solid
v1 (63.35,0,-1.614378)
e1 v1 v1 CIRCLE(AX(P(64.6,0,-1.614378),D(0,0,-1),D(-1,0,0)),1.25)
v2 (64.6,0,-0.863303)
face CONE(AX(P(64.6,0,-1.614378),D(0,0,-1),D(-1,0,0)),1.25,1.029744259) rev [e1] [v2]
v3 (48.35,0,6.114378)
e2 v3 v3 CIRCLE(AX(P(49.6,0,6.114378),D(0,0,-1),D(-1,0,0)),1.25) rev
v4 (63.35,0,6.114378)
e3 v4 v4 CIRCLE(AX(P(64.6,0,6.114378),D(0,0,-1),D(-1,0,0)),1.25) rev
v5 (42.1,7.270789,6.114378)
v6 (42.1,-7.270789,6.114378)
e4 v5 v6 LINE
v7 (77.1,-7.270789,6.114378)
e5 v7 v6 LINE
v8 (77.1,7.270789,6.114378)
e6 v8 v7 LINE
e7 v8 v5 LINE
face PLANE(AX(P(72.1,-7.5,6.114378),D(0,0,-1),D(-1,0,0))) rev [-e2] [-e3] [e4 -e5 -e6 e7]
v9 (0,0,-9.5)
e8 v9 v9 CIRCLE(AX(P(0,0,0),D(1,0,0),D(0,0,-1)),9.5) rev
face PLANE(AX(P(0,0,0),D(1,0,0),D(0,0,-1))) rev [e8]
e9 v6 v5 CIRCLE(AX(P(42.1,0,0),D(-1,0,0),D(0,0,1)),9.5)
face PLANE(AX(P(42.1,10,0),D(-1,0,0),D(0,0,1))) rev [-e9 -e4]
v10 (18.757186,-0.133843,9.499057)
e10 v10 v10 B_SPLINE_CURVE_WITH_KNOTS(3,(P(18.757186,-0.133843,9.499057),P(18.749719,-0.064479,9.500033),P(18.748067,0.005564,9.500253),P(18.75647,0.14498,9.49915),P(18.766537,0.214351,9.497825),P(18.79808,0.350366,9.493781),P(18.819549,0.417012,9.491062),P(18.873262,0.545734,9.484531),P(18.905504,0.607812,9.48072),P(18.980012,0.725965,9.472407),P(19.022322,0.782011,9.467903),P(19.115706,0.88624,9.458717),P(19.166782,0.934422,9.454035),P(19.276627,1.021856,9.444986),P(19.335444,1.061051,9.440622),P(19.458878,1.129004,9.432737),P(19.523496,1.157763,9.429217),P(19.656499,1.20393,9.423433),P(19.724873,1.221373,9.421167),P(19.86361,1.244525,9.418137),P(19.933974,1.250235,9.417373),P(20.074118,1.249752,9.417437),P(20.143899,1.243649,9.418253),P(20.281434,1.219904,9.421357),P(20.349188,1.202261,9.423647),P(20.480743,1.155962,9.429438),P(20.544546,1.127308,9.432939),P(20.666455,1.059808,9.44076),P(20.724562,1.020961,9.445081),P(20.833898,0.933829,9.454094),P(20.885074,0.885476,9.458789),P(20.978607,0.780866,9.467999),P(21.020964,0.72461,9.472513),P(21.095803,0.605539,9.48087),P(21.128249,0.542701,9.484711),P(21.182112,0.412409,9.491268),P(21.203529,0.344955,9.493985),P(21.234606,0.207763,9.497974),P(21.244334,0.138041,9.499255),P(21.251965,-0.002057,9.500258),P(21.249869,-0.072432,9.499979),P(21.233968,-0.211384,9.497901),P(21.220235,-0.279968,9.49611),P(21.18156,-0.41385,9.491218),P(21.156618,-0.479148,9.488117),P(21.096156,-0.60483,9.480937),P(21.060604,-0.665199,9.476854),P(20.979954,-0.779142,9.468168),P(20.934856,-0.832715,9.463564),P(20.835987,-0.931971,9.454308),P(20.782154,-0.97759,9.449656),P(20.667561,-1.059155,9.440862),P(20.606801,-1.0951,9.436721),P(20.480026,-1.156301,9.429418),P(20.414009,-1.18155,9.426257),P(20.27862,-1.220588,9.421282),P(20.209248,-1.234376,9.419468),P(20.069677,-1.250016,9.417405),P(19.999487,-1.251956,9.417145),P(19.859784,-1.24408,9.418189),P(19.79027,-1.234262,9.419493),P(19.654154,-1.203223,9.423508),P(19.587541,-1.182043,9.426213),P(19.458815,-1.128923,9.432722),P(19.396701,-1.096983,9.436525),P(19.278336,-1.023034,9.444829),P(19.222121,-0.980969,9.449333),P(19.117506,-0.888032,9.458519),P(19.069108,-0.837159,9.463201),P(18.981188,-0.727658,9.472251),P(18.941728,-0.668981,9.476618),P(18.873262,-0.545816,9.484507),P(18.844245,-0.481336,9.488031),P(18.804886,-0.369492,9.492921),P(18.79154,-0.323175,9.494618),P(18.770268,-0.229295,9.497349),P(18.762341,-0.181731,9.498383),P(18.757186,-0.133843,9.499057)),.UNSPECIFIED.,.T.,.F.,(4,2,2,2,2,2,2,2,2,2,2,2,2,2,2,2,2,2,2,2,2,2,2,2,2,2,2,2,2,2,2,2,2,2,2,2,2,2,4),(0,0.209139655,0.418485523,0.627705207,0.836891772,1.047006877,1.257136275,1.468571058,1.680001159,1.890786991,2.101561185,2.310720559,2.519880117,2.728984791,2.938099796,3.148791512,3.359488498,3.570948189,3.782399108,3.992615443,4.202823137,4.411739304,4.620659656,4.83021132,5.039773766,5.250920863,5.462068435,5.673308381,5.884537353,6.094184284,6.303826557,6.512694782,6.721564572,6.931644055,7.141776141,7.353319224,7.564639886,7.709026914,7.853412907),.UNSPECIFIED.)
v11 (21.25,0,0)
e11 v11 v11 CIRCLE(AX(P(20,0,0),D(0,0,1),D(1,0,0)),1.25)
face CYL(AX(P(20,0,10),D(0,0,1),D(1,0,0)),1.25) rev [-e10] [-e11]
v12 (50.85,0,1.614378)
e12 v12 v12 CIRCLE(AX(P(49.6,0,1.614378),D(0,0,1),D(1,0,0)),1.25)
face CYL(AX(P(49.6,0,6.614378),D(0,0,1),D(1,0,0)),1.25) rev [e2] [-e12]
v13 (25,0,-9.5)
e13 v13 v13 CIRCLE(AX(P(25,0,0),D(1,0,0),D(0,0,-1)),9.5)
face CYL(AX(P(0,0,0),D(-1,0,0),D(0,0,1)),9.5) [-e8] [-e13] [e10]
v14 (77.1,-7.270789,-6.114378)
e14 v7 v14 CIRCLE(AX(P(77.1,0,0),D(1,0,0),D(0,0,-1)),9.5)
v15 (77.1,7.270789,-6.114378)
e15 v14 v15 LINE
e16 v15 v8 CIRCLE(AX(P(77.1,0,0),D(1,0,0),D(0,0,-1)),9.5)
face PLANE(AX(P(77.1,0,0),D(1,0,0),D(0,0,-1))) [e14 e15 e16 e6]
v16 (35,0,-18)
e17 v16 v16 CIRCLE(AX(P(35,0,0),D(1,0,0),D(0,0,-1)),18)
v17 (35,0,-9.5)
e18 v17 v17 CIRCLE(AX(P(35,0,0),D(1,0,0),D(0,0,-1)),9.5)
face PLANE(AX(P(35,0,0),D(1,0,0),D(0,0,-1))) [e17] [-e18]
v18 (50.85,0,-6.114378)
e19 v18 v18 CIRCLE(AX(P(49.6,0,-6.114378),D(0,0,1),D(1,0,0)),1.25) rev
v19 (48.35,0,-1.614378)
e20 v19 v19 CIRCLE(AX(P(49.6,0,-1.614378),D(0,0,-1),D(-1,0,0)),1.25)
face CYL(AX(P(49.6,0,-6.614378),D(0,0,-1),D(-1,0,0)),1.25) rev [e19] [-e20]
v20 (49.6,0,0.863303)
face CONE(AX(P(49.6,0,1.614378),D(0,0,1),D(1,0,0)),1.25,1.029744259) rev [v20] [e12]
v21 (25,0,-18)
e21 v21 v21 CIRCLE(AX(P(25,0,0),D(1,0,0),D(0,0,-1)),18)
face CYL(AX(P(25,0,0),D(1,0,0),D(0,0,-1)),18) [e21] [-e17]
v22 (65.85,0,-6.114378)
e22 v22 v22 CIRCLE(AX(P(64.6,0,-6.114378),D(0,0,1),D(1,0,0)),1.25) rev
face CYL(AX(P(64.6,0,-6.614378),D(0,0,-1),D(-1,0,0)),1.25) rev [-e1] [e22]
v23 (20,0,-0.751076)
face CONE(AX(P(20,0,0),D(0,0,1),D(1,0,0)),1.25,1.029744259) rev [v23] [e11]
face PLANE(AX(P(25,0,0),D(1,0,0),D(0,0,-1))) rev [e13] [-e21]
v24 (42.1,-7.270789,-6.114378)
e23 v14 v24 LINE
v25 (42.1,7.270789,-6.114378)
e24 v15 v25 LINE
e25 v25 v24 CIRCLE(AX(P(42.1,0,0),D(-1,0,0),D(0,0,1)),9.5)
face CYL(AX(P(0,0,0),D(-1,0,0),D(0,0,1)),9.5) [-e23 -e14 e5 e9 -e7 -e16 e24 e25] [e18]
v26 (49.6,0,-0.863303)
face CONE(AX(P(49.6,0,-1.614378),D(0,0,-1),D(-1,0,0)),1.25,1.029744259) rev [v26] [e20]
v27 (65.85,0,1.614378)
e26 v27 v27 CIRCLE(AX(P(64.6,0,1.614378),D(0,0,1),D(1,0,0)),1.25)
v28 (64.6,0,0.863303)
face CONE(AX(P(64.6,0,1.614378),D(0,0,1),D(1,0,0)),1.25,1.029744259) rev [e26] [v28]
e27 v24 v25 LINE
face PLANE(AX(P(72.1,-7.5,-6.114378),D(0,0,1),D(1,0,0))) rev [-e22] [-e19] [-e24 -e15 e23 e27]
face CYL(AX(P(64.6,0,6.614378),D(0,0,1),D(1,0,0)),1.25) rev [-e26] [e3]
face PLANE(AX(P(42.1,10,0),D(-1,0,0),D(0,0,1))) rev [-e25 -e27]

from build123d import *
from build123d.topology import SkipClean

# Parameters (mm, degrees)
SKETCH1_W                           = 42.1
SKETCH1_H                           = 10
BOSS_EXTRUDE1_START                 = 30
BOSS_EXTRUDE1_DEPTH                 = 30
BOSS_EXTRUDE2_START                 = -7.1
SKETCH8_R                           = 18
BOSS_EXTRUDE2_DEPTH                 = 10
M3X0_5_TAPPED_HOLE3_D               = 2.5
M3X0_5_TAPPED_HOLE3_DEPTH           = 10
M3X0_5_TAPPED_HOLE3_TIP             = 0.751076
M3X0_5_TAPPED_HOLE2_D               = 2.5
M3X0_5_TAPPED_HOLE2_DEPTH           = 5
M3X0_5_TAPPED_HOLE2_TIP             = 0.751076
M3X0_5_TAPPED_HOLE2_ON_FACE_2_D     = 2.5
M3X0_5_TAPPED_HOLE2_ON_FACE_2_DEPTH = 5
M3X0_5_TAPPED_HOLE2_ON_FACE_2_TIP   = 0.751076
BOSS_EXTRUDE3_START                 = 5
BOSS_EXTRUDE3_DEPTH                 = 5
TOLERANCING_START                   = 42.1
TOLERANCING_DEPTH                   = 35
TOLERANCING_2_OUTLINE_R             = 10
TOLERANCING_2_OUTLINE_R_2           = 9.5
TOLERANCING_2_DEPTH                 = 25
TOLERANCING_START_2                 = 35
TOLERANCING_3_OUTLINE_R             = 10
TOLERANCING_3_OUTLINE_R_2           = 9.5
TOLERANCING_3_DEPTH                 = 7.1


# Read off the part's stored shape, not the designer's step: Tolerancing
with BuildPart() as part:
    # Sketch1 → Revolve1 (revolve)
    with BuildSketch(Plane.XY, mode=Mode.PRIVATE) as revolve1_sk:
        with Locations((21.05, 5)):
            Rectangle(SKETCH1_W, SKETCH1_H)
    revolve(revolve1_sk.sketch.rotate(Axis((0, 0, 0), (1, 0, 0)), 90), axis=Axis((0, 0, 0), (1, 0, 0)))

    # Sketch3 → Boss-Extrude1 (add)
    with BuildSketch(Plane(origin=(42.1, 0, 0), x_dir=(0, 0, -1), z_dir=(1, 0, 0)).offset(BOSS_EXTRUDE1_START)):
        with BuildLine():
            Line((-6.614378, -7.5), (-6.614378, 7.5))
            ThreePointArc((-6.614378, 7.5), (0, 10), (6.614378, 7.5))
            Line((6.614378, 7.5), (6.614378, -7.5))
            ThreePointArc((6.614378, -7.5), (0, -10), (-6.614378, -7.5))
        make_face()
    extrude(amount=-BOSS_EXTRUDE1_DEPTH)

    # Sketch8 → Boss-Extrude2 (add)
    with BuildSketch(Plane(origin=(42.1, 0, 0), x_dir=(0, 0, -1), z_dir=(1, 0, 0)).offset(BOSS_EXTRUDE2_START)):
        Circle(SKETCH8_R)
    extrude(amount=-BOSS_EXTRUDE2_DEPTH)

    # M3x0.5 Tapped Hole3
    with Locations(Plane.XY.offset(10)):
        with Locations((20, 0)):
            Hole(M3X0_5_TAPPED_HOLE3_D / 2, depth=M3X0_5_TAPPED_HOLE3_DEPTH)
            with Locations((0, 0, -(M3X0_5_TAPPED_HOLE3_DEPTH + M3X0_5_TAPPED_HOLE3_TIP / 2))):  # 118° drill point
                Cone(0, M3X0_5_TAPPED_HOLE3_D / 2, M3X0_5_TAPPED_HOLE3_TIP, mode=Mode.SUBTRACT)

    # M3x0.5 Tapped Hole2
    with Locations(Plane(origin=(49.6, 0, 6.614378), x_dir=(1, 0, 0), z_dir=(0, 0, 1))):
        with Locations((0, 0), (15, 0)):
            Hole(M3X0_5_TAPPED_HOLE2_D / 2, depth=M3X0_5_TAPPED_HOLE2_DEPTH)
            with Locations((0, 0, -(M3X0_5_TAPPED_HOLE2_DEPTH + M3X0_5_TAPPED_HOLE2_TIP / 2))):  # 118° drill point
                Cone(0, M3X0_5_TAPPED_HOLE2_D / 2, M3X0_5_TAPPED_HOLE2_TIP, mode=Mode.SUBTRACT)

    # M3x0.5 Tapped Hole2 on face 2
    with Locations(Plane(origin=(64.6, 0, -6.614378), x_dir=(-1, 0, 0), z_dir=(0, 0, -1))):
        with Locations((0, 0), (15, 0)):
            Hole(M3X0_5_TAPPED_HOLE2_ON_FACE_2_D / 2, depth=M3X0_5_TAPPED_HOLE2_ON_FACE_2_DEPTH)
            with Locations((0, 0, -(M3X0_5_TAPPED_HOLE2_ON_FACE_2_DEPTH + M3X0_5_TAPPED_HOLE2_ON_FACE_2_TIP / 2))):  # 118° drill point
                Cone(0, M3X0_5_TAPPED_HOLE2_ON_FACE_2_D / 2, M3X0_5_TAPPED_HOLE2_ON_FACE_2_TIP, mode=Mode.SUBTRACT)

    # Sketch9 → Boss-Extrude3 (add)
    with SkipClean():  # the faces are left unmerged after this step: merging them gives an invalid solid
        with BuildSketch(Plane(origin=(72.1, 0, 0), x_dir=(0, 0, -1), z_dir=(1, 0, 0)).offset(BOSS_EXTRUDE3_START)):
            with BuildLine():
                Line((6.614378, -7.5), (6.614378, 7.5))
                ThreePointArc((6.614378, 7.5), (0, 10), (-6.614378, 7.5))
                Line((-6.614378, 7.5), (-6.614378, -7.5))
                ThreePointArc((-6.614378, -7.5), (0, -10), (6.614378, -7.5))
            make_face()
        extrude(amount=-BOSS_EXTRUDE3_DEPTH)

    # Tolerancing outline → Tolerancing (cut)
    with BuildSketch(Plane.YZ.offset(TOLERANCING_START)):
        with BuildLine():
            Line((7.5, 6.614378), (-7.5, 6.614378))
            ThreePointArc((-7.5, 6.614378), (-10, 0), (-7.5, -6.614378))
            Line((-7.5, -6.614378), (7.5, -6.614378))
            ThreePointArc((7.5, -6.614378), (10, 0), (7.5, 6.614378))
        make_face()
        with BuildLine():
            ThreePointArc((7.270789, 6.114378), (9.5, 0), (7.270789, -6.114378))
            Line((7.270789, -6.114378), (-7.270789, -6.114378))
            ThreePointArc((-7.270789, -6.114378), (-9.5, 0), (-7.270789, 6.114378))
            Line((-7.270789, 6.114378), (7.270789, 6.114378))
        make_face(mode=Mode.SUBTRACT)
    extrude(amount=TOLERANCING_DEPTH, mode=Mode.SUBTRACT)

    # Tolerancing 2 outline → Tolerancing 2 (cut)
    with BuildSketch(Plane.YZ):
        Circle(TOLERANCING_2_OUTLINE_R)
        Circle(TOLERANCING_2_OUTLINE_R_2, mode=Mode.SUBTRACT)
    extrude(amount=TOLERANCING_2_DEPTH, mode=Mode.SUBTRACT)

    # Tolerancing 3 outline → Tolerancing 3 (cut)
    with BuildSketch(Plane.YZ.offset(TOLERANCING_START_2)):
        Circle(TOLERANCING_3_OUTLINE_R)
        Circle(TOLERANCING_3_OUTLINE_R_2, mode=Mode.SUBTRACT)
    extrude(amount=TOLERANCING_3_DEPTH, mode=Mode.SUBTRACT)


solid = part.part
